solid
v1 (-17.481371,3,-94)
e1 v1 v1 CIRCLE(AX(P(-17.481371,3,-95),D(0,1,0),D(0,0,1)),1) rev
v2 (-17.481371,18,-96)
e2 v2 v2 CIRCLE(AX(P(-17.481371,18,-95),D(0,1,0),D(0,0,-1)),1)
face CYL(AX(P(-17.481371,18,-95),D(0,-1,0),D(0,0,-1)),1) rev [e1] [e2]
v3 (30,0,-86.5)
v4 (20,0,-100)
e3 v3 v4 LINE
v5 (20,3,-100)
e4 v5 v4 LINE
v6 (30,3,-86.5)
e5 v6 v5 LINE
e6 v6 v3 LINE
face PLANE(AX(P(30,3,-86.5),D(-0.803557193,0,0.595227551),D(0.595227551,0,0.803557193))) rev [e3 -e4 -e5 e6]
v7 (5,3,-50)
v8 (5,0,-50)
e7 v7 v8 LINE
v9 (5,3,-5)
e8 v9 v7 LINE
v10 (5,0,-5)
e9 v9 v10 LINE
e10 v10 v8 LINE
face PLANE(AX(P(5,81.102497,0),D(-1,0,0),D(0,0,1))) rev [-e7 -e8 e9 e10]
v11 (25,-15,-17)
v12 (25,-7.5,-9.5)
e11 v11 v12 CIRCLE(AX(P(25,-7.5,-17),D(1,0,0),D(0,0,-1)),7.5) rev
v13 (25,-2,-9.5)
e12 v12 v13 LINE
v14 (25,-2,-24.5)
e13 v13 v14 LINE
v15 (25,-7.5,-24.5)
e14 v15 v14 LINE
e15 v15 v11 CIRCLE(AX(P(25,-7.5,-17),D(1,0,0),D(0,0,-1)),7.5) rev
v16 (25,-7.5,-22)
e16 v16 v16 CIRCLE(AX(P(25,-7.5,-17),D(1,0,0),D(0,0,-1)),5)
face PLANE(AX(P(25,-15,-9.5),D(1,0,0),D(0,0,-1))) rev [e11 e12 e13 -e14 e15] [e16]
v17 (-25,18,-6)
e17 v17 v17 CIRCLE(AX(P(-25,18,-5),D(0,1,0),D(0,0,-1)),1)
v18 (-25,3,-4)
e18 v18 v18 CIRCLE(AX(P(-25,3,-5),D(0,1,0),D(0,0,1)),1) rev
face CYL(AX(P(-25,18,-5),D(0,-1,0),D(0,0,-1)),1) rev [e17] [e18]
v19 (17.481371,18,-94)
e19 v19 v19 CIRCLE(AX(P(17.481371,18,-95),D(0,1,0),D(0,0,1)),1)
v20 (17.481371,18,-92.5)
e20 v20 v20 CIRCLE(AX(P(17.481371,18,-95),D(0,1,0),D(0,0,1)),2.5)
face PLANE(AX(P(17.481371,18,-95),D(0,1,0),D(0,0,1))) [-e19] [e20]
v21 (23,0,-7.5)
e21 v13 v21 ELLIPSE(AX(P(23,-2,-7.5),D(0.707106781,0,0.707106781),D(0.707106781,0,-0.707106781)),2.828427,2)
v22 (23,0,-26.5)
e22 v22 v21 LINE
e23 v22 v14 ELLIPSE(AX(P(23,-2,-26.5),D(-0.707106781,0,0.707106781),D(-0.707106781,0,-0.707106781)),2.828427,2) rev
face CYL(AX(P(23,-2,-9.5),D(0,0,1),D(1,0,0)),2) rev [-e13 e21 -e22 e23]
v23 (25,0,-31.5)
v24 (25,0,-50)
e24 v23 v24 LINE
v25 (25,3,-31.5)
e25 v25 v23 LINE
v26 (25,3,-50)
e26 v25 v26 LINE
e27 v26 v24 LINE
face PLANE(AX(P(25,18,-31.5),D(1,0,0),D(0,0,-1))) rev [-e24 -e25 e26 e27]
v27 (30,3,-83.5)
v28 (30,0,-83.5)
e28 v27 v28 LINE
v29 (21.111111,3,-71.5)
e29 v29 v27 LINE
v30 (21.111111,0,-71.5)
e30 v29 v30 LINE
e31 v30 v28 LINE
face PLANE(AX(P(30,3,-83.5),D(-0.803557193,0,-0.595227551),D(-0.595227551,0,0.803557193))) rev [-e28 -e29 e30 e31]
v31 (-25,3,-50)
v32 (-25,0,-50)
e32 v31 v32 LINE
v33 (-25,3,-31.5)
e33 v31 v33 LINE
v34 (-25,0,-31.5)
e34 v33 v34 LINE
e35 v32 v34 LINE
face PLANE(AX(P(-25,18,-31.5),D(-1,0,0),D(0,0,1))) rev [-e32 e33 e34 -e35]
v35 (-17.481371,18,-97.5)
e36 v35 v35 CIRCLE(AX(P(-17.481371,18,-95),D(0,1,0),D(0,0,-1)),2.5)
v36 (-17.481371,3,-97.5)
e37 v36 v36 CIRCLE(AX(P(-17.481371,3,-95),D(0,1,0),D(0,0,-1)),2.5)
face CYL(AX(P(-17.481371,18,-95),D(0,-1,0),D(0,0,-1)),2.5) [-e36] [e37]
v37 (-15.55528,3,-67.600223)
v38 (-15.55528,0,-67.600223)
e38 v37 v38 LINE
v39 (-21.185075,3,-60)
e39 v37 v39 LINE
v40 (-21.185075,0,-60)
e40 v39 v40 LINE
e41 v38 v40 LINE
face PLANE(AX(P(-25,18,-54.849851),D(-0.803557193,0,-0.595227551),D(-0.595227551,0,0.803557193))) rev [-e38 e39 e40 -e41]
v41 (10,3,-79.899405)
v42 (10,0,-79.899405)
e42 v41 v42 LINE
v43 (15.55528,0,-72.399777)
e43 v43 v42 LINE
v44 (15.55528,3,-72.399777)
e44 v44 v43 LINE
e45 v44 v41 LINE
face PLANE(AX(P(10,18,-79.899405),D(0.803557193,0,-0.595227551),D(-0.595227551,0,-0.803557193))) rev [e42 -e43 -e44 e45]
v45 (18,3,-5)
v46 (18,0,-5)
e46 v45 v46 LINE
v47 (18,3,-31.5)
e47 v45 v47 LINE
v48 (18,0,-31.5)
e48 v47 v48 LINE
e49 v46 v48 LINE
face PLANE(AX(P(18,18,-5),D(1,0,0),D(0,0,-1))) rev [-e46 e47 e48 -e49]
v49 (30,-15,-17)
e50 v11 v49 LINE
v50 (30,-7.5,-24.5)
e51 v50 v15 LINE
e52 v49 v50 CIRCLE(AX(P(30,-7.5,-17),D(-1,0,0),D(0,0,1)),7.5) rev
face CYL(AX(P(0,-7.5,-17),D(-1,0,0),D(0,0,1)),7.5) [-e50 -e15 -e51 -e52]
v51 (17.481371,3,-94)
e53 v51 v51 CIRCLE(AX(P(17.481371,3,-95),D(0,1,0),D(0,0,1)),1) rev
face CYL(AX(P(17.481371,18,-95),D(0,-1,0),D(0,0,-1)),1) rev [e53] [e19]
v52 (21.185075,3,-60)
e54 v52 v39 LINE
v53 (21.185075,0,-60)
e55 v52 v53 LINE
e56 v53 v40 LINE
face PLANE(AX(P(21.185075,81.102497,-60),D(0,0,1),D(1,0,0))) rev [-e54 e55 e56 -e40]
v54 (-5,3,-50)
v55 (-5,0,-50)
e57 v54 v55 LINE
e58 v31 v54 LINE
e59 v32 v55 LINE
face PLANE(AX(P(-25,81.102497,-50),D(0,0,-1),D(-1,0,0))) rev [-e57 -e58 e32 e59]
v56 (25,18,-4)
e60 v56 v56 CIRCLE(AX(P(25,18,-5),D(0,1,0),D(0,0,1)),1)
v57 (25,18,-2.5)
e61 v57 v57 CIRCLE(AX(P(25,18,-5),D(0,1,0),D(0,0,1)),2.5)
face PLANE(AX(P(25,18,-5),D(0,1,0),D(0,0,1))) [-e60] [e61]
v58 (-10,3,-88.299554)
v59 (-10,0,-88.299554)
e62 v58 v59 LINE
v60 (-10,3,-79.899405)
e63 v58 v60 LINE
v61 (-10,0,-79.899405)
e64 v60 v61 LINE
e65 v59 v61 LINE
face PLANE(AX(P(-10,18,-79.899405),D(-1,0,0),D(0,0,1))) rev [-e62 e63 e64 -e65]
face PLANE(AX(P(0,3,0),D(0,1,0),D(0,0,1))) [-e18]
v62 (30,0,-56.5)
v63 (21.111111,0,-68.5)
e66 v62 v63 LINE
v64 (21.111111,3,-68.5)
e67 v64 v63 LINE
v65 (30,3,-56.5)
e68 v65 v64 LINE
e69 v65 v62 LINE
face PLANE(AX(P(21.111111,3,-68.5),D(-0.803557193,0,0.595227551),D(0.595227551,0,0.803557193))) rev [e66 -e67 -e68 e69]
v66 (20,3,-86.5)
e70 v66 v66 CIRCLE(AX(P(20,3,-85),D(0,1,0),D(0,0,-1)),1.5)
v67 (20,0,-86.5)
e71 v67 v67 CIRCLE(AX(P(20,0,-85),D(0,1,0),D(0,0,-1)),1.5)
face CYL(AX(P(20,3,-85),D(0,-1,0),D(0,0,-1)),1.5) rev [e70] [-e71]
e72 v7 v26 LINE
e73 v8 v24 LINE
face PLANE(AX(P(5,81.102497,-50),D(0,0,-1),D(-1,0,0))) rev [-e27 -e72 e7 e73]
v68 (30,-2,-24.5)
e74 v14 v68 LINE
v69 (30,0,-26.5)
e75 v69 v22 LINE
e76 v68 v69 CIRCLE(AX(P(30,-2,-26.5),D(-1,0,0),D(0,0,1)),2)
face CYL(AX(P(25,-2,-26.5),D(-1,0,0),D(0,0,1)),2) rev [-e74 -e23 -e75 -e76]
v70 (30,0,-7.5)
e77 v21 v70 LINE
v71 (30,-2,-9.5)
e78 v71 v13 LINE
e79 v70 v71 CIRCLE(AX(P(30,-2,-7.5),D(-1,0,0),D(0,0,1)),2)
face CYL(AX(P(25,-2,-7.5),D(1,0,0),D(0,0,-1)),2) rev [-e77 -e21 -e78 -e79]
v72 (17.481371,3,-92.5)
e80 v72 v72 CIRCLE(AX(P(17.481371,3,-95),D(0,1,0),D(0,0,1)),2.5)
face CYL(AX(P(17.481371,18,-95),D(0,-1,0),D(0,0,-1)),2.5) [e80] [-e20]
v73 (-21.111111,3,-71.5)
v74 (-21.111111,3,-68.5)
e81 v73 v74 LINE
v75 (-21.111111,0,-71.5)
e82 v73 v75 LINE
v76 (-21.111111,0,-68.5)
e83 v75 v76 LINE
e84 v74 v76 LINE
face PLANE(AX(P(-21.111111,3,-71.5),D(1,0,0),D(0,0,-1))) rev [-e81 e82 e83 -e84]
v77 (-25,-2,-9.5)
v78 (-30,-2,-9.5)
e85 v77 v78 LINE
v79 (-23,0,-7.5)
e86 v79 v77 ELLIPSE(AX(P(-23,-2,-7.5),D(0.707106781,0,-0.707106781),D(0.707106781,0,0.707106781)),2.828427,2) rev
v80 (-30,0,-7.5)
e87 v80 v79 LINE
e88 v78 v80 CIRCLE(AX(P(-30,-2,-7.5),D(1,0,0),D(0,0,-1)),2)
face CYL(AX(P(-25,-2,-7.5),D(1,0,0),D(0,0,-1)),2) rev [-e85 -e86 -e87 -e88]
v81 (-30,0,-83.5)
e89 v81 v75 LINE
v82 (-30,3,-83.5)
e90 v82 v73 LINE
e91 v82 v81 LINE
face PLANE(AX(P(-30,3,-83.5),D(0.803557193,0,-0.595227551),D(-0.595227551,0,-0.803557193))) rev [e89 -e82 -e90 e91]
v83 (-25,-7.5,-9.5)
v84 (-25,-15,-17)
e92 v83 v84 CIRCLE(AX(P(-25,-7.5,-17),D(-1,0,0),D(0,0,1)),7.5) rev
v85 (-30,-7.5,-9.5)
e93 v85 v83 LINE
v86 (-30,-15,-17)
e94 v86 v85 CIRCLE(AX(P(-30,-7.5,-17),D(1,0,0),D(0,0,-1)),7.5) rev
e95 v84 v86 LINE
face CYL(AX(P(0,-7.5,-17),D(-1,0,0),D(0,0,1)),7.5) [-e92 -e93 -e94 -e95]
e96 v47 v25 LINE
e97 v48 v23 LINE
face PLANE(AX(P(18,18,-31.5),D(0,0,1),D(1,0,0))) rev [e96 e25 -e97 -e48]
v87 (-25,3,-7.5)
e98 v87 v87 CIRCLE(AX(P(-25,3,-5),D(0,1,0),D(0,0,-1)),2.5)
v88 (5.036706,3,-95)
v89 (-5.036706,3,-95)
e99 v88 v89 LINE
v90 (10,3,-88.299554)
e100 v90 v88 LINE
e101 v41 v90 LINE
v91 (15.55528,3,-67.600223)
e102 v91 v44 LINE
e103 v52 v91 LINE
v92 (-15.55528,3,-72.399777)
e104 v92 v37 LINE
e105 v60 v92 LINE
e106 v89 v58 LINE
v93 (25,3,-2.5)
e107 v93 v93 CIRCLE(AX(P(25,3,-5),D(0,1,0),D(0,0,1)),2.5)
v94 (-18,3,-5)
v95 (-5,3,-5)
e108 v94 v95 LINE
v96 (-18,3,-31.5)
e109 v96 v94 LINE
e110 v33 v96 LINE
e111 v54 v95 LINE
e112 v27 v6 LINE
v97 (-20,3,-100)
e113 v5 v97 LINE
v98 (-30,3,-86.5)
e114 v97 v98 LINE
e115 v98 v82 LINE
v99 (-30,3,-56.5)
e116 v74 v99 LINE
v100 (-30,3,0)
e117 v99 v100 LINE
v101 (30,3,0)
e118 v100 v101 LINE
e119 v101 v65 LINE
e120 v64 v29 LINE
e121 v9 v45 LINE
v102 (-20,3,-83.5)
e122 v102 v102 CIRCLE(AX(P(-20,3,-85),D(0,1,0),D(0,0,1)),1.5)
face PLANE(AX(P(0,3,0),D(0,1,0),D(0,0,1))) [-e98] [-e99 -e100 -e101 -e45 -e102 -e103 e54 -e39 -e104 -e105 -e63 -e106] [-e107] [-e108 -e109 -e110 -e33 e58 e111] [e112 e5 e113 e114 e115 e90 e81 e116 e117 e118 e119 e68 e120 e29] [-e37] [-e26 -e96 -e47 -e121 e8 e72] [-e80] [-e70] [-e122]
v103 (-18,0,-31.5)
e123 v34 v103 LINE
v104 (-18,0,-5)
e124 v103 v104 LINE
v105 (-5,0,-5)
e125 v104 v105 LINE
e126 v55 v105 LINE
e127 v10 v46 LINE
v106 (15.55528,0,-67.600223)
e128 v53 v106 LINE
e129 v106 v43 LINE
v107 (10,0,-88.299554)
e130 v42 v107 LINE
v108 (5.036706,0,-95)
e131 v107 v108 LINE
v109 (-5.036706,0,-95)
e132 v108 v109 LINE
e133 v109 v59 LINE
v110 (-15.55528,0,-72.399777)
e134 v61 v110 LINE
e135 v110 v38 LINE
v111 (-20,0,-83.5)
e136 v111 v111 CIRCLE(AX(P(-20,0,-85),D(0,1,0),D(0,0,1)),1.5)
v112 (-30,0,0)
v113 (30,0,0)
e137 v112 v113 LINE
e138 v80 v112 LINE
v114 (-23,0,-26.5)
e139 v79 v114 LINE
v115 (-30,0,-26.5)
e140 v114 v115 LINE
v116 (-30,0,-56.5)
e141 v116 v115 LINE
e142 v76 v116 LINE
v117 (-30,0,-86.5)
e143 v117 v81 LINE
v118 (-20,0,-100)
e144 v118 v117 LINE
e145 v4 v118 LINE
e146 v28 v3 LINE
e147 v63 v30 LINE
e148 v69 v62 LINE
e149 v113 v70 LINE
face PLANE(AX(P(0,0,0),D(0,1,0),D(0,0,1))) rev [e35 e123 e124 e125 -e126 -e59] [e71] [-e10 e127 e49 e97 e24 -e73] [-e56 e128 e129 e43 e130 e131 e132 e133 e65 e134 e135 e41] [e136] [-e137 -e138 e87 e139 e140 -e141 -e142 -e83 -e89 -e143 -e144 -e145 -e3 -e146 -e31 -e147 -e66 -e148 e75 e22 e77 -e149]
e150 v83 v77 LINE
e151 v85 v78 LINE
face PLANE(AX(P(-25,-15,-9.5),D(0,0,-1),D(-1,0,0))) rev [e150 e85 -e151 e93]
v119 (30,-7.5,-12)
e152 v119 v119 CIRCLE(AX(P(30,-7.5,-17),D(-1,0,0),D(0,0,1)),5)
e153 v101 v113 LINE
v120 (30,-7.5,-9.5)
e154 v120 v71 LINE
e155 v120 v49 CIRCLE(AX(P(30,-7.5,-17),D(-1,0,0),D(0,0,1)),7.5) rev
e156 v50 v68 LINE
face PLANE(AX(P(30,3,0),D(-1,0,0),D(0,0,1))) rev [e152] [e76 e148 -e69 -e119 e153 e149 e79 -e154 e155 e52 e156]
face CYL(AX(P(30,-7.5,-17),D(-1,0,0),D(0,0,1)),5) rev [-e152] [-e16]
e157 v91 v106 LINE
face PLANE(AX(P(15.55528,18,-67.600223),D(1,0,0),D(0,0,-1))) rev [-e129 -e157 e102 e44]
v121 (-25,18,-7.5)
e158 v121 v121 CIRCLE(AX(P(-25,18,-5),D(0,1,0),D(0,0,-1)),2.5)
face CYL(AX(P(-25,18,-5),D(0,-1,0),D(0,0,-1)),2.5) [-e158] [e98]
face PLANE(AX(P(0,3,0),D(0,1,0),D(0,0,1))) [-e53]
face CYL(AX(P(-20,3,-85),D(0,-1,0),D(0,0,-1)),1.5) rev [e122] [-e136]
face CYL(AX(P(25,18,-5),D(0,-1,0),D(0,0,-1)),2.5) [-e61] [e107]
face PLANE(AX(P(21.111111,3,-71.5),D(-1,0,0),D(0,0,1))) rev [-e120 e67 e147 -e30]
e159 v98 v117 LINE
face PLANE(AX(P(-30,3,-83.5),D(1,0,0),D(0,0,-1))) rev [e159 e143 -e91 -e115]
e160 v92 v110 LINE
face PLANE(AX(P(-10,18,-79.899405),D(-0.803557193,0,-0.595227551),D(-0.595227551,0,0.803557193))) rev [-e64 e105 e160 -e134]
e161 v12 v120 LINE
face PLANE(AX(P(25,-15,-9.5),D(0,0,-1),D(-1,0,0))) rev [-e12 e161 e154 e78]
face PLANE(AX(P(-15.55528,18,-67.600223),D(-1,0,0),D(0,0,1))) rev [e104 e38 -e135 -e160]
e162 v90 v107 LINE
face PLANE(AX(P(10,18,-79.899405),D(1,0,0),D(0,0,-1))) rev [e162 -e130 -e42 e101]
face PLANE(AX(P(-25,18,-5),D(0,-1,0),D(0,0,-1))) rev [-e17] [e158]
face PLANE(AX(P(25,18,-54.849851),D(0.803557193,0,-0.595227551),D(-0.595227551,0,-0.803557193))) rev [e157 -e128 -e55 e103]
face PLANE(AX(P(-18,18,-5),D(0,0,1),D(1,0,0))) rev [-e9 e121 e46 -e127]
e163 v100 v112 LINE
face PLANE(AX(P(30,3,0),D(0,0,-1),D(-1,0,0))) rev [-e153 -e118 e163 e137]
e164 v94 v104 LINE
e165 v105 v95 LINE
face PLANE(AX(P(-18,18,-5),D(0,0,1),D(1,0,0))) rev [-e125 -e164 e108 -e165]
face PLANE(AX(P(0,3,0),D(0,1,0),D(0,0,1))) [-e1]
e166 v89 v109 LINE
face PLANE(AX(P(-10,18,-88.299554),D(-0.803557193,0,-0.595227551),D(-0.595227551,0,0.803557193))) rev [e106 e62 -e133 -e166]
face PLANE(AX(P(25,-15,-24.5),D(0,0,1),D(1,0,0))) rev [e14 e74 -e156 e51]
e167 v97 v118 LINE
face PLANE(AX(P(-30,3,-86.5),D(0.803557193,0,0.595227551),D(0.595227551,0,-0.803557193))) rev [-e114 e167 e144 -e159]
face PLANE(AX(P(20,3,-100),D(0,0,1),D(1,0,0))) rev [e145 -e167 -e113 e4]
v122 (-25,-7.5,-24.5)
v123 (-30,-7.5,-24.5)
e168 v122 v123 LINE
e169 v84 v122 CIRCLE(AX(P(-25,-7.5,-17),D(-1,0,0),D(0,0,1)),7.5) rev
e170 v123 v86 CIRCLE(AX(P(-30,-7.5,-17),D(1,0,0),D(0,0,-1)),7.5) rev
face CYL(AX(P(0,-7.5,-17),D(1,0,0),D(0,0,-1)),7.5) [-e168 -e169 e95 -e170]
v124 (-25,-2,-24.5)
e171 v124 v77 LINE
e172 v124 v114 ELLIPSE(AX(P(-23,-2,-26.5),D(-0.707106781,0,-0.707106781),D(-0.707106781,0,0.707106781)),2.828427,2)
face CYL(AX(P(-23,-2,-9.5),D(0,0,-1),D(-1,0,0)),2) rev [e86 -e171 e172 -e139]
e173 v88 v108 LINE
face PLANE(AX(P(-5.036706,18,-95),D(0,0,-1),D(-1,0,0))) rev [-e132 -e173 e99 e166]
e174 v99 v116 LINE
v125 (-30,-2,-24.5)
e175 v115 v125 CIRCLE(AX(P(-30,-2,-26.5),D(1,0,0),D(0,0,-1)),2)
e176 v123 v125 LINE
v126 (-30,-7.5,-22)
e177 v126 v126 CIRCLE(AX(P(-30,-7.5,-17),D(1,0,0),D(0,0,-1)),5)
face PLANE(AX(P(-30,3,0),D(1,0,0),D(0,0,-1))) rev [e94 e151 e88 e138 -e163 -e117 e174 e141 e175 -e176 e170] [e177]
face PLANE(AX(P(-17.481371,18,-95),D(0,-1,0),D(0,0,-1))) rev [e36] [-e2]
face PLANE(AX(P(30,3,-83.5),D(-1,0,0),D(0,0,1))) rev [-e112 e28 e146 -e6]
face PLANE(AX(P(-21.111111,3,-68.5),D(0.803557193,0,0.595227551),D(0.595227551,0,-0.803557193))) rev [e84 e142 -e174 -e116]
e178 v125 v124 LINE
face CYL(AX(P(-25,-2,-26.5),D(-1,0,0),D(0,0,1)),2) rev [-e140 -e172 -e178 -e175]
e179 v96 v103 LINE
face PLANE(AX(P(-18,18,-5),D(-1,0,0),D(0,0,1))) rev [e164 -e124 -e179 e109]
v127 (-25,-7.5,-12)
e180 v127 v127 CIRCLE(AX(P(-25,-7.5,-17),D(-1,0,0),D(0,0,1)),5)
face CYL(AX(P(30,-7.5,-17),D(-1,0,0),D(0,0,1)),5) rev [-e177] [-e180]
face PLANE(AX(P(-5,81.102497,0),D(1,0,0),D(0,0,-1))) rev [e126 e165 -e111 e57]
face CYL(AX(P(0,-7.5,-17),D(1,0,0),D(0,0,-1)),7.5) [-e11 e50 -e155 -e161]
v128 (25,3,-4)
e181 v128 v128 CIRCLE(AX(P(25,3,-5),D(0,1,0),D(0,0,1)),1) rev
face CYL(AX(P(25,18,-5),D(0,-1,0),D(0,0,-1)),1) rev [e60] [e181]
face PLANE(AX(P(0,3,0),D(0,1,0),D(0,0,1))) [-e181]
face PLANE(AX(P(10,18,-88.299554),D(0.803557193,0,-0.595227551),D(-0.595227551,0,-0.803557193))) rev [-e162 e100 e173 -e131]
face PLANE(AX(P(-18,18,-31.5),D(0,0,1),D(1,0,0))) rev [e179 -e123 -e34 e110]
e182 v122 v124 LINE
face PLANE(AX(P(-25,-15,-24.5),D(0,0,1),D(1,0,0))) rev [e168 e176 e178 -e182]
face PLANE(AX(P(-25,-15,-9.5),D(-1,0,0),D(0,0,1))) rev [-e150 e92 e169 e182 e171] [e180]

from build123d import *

# Parameters (mm, degrees)
SKETCH2_R               = 1.5
BOSS_EXTRUDE1_DEPTH     = 3
SKETCH5_W               = 5
SKETCH5_H               = 15
BOSS_EXTRUDE3_DEPTH     = 15
CUT_EXTRUDE1_DEPTH      = 118.579760163
CUT_EXTRUDE1_DEPTH_BACK = 118.579760163
SKETCH6_R               = 5
FILLET1_R               = 7.5
FILLET2_R               = 2
SKETCH7_R               = 2.5
SKETCH7_R_2             = 1
BOSS_EXTRUDE4_DEPTH     = 15
CUT_EXTRUDE2_DEPTH      = 106.943381105
CUT_EXTRUDE2_DEPTH_BACK = 106.943381105
BOSS_EXTRUDE5_DEPTH     = 3


with BuildPart() as part:
    # Sketch2 → Boss-Extrude1 (new body)
    with BuildSketch(Plane(origin=(0, 0, 0), x_dir=(1, 0, 0), z_dir=(0, 1, 0))):
        Polygon((30, 0), (-30, 0), (-30, 56.5), (-21.111111111, 68.5), (-21.111111111, 71.5), (-30, 83.5), (-30, 86.5), (-20, 100), (20, 100), (30, 86.5), (30, 83.5), (21.111111111, 71.5), (21.111111111, 68.5), (30, 56.5), align=None)
        with Locations(Location((-20, 85, 0), (0, 0, 270))):
            Circle(SKETCH2_R, mode=Mode.SUBTRACT)
        with Locations(Location((20, 85, 0), (0, 0, 90))):
            Circle(SKETCH2_R, mode=Mode.SUBTRACT)
    extrude(amount=BOSS_EXTRUDE1_DEPTH)

    # Sketch5 → Boss-Extrude3 (add)
    with BuildSketch(Plane.XZ):
        with Locations((-27.5, -17)):
            Rectangle(SKETCH5_W, SKETCH5_H)
        with Locations((27.5, -17)):
            Rectangle(SKETCH5_W, SKETCH5_H)
    extrude(amount=BOSS_EXTRUDE3_DEPTH)

    # Sketch6 → Cut-Extrude1 (cut, two sides: drawn at the far end of the back side and taken through both)
    with BuildSketch(Plane.ZY.offset(30).offset(-CUT_EXTRUDE1_DEPTH_BACK)):
        with Locations((-17, -7.5)):
            Circle(SKETCH6_R)
    extrude(amount=CUT_EXTRUDE1_DEPTH + CUT_EXTRUDE1_DEPTH_BACK, mode=Mode.SUBTRACT)

    # Fillet1
    fillet1_edges = [part.edges().sort_by_distance(p)[0] for p in [
        (27.5, -15, -9.5),
        (27.5, -15, -24.5),
        (-27.5, -15, -24.5),
        (-27.5, -15, -9.5),
    ]]
    fillet(fillet1_edges, radius=FILLET1_R - 0.0001)  # a hair under: the kernel refuses the full size

    # Fillet2
    fillet2_edges = [part.edges().sort_by_distance(p)[0] for p in [
        (-27.5, 0, -24.5),
        (-25, 0, -17),
        (-27.5, 0, -9.5),
        (25, 0, -17),
        (27.5, 0, -24.5),
        (27.5, 0, -9.5),
    ]]
    fillet(fillet2_edges, radius=FILLET2_R)

    # Sketch7 → Boss-Extrude4 (add)
    # profile 1 of 4: a face of its own
    with BuildSketch(Plane(origin=(0, 3, 0), x_dir=(1, 0, 0), z_dir=(0, 1, 0))):
        with Locations(Location((25, 5, 0), (0, 0, 270))):
            Circle(SKETCH7_R)
        with Locations(Location((25, 5, 0), (0, 0, 270))):
            Circle(SKETCH7_R_2, mode=Mode.SUBTRACT)
    # profile 2 of 4: a face of its own
    with BuildSketch(Plane(origin=(0, 3, 0), x_dir=(1, 0, 0), z_dir=(0, 1, 0))):
        with Locations(Location((-25, 5, 0), (0, 0, 90))):
            Circle(SKETCH7_R)
        with Locations(Location((-25, 5, 0), (0, 0, 90))):
            Circle(SKETCH7_R_2, mode=Mode.SUBTRACT)
    # profile 3 of 4: a face of its own
    with BuildSketch(Plane(origin=(0, 3, 0), x_dir=(1, 0, 0), z_dir=(0, 1, 0))):
        with Locations(Location((17.481371253, 95, 0), (0, 0, 270))):
            Circle(SKETCH7_R)
        with Locations(Location((17.481371253, 95, 0), (0, 0, 270))):
            Circle(SKETCH7_R_2, mode=Mode.SUBTRACT)
    # profile 4 of 4: a face of its own
    with BuildSketch(Plane(origin=(0, 3, 0), x_dir=(1, 0, 0), z_dir=(0, 1, 0))):
        with Locations(Location((-17.481371253, 95, 0), (0, 0, 90))):
            Circle(SKETCH7_R)
        with Locations(Location((-17.481371253, 95, 0), (0, 0, 90))):
            Circle(SKETCH7_R_2, mode=Mode.SUBTRACT)
    extrude(amount=BOSS_EXTRUDE4_DEPTH)

    # Sketch8 → Cut-Extrude2 (cut, two sides: drawn at the far end of the back side and taken through both)
    with BuildSketch(Plane.XZ.offset(-CUT_EXTRUDE2_DEPTH_BACK)):
        Polygon((-18, -5), (-18, -31.5), (-25, -31.5), (-25, -54.849851192), (-15.555279985, -67.600223212), (-15.555279985, -72.399776788), (-10, -79.899404767), (-10, -88.299553575), (-5.036706352, -95), (5.036706352, -95), (10, -88.299553575), (10, -79.899404767), (15.555279985, -72.399776788), (15.555279985, -67.600223212), (25, -54.849851192), (25, -31.5), (18, -31.5), (18, -5), align=None)
    extrude(amount=CUT_EXTRUDE2_DEPTH + CUT_EXTRUDE2_DEPTH_BACK, mode=Mode.SUBTRACT)

    # Sketch9 → Boss-Extrude5 (add)
    with BuildSketch(Plane(origin=(0, 0, 0), x_dir=(1, 0, 0), z_dir=(0, 1, 0))):
        Polygon((-25, 50), (-5, 50), (-5, 0), (5, 0), (5, 50), (25, 50), (25, 54.849851192), (21.185074957, 60), (-21.185074957, 60), (-25, 54.849851192), align=None)
    extrude(amount=BOSS_EXTRUDE5_DEPTH)


solid = part.part
